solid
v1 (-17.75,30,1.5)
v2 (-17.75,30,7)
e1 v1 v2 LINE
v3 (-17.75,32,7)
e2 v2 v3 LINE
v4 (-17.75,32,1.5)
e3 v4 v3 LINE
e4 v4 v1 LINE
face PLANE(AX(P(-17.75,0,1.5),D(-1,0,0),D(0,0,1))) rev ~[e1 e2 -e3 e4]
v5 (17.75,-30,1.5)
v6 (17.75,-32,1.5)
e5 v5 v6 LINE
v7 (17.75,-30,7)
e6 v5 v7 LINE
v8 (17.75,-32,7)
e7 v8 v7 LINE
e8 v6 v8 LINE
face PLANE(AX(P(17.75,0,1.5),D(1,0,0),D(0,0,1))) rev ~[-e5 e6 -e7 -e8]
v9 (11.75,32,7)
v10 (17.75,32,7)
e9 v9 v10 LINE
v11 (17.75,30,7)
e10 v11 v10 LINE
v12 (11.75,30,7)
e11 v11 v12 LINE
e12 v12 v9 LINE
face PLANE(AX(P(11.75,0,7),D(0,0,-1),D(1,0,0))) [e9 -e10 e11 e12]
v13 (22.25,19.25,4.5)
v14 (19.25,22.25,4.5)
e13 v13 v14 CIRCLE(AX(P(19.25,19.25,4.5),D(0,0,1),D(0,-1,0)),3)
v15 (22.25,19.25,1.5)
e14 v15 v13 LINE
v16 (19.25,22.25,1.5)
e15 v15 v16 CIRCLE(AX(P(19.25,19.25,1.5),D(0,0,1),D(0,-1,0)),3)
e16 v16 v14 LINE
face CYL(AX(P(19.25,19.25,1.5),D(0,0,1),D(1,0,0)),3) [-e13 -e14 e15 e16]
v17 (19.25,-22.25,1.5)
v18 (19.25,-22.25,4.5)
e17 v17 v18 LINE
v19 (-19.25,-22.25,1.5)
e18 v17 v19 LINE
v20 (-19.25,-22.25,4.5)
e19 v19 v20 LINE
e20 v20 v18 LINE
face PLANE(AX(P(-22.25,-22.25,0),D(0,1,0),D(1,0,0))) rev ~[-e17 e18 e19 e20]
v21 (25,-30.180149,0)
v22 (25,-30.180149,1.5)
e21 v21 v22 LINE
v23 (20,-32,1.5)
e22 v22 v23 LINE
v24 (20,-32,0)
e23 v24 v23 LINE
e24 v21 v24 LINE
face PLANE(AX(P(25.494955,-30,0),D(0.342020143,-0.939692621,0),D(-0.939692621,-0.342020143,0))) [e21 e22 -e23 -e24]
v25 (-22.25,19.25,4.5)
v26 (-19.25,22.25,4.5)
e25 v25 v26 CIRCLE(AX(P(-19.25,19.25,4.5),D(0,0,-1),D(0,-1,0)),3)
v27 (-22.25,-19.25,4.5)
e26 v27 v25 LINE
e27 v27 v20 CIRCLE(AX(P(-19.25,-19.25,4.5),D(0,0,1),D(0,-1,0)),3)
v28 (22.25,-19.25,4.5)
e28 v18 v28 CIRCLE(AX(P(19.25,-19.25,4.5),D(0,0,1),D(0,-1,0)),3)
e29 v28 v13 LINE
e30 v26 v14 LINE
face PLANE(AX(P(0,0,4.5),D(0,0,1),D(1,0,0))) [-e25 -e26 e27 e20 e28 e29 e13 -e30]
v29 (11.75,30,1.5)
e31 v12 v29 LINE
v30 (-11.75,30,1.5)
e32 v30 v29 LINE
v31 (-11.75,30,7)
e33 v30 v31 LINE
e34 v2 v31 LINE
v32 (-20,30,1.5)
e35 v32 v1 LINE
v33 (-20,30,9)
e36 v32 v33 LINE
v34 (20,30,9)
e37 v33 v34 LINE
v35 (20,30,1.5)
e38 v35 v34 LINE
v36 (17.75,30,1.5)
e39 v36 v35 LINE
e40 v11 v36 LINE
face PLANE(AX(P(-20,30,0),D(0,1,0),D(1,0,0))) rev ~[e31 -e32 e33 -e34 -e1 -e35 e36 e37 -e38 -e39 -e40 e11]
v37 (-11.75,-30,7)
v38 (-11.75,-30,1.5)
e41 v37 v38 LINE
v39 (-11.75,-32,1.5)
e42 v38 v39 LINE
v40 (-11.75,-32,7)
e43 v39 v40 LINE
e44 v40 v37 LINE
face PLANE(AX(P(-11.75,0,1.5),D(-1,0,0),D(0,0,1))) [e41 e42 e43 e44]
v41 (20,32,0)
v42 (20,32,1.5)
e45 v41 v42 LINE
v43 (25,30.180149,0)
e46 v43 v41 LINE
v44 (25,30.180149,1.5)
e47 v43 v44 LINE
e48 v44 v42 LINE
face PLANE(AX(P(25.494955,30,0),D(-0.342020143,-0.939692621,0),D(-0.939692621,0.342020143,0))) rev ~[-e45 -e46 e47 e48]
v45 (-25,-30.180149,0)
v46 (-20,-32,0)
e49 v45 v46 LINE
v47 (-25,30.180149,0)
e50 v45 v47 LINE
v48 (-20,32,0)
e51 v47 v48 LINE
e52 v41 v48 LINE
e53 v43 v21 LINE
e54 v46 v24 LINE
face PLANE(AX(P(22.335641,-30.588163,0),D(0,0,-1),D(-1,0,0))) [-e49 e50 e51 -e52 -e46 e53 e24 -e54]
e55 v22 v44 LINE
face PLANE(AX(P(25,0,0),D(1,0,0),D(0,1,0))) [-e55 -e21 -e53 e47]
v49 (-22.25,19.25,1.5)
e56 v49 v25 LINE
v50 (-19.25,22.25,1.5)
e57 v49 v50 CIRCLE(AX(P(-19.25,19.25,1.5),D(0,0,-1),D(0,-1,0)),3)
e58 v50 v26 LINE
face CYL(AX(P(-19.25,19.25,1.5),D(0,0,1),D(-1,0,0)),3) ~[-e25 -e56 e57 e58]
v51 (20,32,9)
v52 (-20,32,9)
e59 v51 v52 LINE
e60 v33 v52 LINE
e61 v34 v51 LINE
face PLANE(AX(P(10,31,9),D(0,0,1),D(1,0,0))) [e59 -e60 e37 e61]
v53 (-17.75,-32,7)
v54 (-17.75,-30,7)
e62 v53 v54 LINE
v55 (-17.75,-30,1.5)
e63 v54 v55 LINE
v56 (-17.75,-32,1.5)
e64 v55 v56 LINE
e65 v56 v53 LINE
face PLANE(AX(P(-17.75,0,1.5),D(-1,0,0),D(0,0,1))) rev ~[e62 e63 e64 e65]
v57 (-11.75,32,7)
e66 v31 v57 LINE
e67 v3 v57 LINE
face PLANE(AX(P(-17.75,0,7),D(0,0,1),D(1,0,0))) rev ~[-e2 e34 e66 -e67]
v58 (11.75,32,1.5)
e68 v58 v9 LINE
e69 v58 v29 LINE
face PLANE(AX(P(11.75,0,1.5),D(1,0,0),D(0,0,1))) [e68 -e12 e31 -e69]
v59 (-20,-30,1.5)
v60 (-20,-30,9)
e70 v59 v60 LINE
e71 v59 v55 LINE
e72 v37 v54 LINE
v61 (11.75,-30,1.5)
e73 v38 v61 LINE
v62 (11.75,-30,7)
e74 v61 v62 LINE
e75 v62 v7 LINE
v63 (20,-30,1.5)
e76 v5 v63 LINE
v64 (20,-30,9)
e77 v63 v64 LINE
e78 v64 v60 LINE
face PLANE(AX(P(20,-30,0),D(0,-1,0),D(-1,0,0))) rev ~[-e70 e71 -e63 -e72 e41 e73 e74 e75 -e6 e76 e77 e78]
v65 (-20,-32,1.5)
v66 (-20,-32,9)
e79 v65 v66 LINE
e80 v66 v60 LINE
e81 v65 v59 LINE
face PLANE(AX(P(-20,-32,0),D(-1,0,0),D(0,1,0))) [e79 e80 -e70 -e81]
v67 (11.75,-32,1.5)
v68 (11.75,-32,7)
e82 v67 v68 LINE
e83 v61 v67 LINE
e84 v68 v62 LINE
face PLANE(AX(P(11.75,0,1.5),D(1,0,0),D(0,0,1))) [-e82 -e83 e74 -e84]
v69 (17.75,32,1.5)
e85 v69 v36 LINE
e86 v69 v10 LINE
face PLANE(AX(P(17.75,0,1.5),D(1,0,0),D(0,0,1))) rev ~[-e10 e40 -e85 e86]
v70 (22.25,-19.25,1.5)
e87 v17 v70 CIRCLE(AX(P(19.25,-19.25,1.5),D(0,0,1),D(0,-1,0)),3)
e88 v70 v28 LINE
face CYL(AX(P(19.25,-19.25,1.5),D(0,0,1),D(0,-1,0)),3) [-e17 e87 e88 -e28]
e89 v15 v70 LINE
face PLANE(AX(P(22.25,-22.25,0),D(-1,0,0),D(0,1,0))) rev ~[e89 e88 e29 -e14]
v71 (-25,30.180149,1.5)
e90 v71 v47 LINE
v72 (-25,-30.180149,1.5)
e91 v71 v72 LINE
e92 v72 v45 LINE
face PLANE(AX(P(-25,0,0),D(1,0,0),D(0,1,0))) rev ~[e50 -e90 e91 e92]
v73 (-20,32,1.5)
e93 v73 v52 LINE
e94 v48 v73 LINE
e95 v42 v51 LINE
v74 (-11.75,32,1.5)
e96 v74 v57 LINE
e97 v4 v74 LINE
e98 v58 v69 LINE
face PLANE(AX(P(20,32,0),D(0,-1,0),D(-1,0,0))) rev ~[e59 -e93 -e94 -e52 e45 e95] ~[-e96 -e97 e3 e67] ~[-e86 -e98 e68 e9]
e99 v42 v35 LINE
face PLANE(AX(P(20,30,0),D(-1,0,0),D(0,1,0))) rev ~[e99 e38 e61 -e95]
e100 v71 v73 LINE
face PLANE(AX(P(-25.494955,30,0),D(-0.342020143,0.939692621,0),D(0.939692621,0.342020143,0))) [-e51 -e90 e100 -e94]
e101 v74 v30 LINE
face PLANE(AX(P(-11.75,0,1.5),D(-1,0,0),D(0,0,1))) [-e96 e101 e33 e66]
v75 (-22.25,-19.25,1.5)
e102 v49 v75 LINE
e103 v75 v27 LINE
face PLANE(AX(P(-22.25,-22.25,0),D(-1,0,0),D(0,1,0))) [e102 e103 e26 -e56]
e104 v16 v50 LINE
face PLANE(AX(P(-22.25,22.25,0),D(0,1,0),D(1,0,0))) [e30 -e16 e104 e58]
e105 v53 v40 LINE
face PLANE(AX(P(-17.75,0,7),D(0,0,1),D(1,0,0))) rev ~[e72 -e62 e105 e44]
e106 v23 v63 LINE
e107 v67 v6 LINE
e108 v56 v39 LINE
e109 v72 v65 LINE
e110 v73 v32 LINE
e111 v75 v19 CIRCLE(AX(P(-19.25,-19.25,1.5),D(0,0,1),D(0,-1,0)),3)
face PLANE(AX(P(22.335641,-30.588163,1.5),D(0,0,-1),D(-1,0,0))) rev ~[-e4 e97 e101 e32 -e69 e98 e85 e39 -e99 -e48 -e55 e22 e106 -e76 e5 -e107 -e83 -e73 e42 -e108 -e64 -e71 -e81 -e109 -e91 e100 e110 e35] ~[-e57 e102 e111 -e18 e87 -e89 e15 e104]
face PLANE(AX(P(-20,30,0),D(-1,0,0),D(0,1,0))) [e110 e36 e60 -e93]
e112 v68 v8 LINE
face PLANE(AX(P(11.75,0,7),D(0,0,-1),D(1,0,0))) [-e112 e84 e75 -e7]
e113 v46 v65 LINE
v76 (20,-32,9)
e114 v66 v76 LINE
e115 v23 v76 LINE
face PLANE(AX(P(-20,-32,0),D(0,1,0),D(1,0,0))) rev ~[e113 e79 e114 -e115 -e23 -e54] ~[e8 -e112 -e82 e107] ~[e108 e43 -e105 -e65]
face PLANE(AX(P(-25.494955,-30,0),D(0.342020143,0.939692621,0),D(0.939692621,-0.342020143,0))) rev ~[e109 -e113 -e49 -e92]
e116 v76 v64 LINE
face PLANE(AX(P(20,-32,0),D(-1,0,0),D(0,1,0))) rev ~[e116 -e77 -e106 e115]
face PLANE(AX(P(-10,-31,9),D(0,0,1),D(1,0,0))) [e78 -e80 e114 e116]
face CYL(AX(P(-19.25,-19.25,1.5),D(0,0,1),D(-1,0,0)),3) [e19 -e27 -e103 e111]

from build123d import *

# Parameters (mm, degrees)
F0_W         = 50
F0_H         = 60
F1_DEPTH     = 1.5
F2_W         = 20
F2_H         = 2
F3_DEPTH     = 9
F4_W         = 6
F4_H         = 5.5
F5_DEPTH     = 32
F6_W         = 44.5
F6_H         = 44.5
F7_DEPTH     = 4.5
F8_R         = 3
F9_T4_DEPTH  = 1.5
F9_T9_DEPTH  = 1.5
F9_T14_DEPTH = 1.5
F9_T19_DEPTH = 1.5


# Not quite as in the source:
# - a fillet or chamfer that OpenCascade refuses, or shapes differently, is made with other operations: its cross-section is extruded or revolved along the edge and cut away or added
# - a feature of the source that left no trace in its solid (it failed there, or was rolled back) is left out


with BuildPart() as f1:
    # F0 (on Top) → F1 (new body)
    with BuildSketch(Plane.XY):
        Rectangle(F0_W, F0_H)
    extrude(amount=F1_DEPTH)

    # F2 (on Top) → F3 (join)
    with BuildSketch(Plane.XY):
        with Locations((10, 31)):
            Rectangle(F2_W, F2_H)
        with Locations((-10, 31)):
            Rectangle(F2_W, F2_H)
        with Locations((-10, -31)):
            Rectangle(F2_W, F2_H)
        with Locations((10, -31)):
            Rectangle(F2_W, F2_H)
    extrude(amount=F3_DEPTH)

    # F4 (on Front) → F5 (cut, symmetric)
    with BuildSketch(Plane.XZ):
        with Locations((-14.75, 4.25)):
            Rectangle(F4_W, F4_H)
        with Locations((14.75, 4.25)):
            Rectangle(F4_W, F4_H)
    extrude(amount=F5_DEPTH, both=True, mode=Mode.SUBTRACT)

    # F6 (on Top) → F7 (join)
    with BuildSketch(Plane.XY):
        Rectangle(F6_W, F6_H)
    extrude(amount=F7_DEPTH)

    # F8
    f8_edges = [f1.edges().sort_by_distance(p)[0] for p in [
        (22.25, -22.25, 3),
        (-22.25, -22.25, 3),
        (-22.25, 22.25, 3),
        (22.25, 22.25, 3),
    ]]
    fillet(f8_edges, radius=F8_R)

    # F9: chamfer of 2 x 5.4949548389 on 4 edges, made by hand


with BuildPart() as f9_tool2:
    # F9_s3 → F9_t4 (new body)
    with BuildSketch(Plane.XY):
        Polygon((25.4949548389, 30), (20, 32), (20, 30), align=None)
    extrude(amount=F9_T4_DEPTH)

    split(bisect_by=Plane.YZ.offset(25), keep=Keep.BOTTOM)


with BuildPart() as f1_1:
    add(f1.part)

    # F9_t1: union F9_tool2
    add(f9_tool2.part)


with BuildPart() as f9_tool7:
    # F9_s8 → F9_t9 (new body)
    with BuildSketch(Plane.XY):
        Polygon((-25.4949548389, -30), (-20, -32), (-20, -30), align=None)
    extrude(amount=F9_T9_DEPTH)

    split(bisect_by=Plane.YZ.offset(-25), keep=Keep.TOP)


with BuildPart() as f1_2:
    add(f1_1.part)

    # F9_t6: union F9_tool7
    add(f9_tool7.part)


with BuildPart() as f9_tool12:
    # F9_s13 → F9_t14 (new body)
    with BuildSketch(Plane.XY):
        Polygon((-25.4949548389, 30), (-20, 32), (-20, 30), align=None)
    extrude(amount=F9_T14_DEPTH)

    split(bisect_by=Plane.YZ.offset(-25), keep=Keep.TOP)


with BuildPart() as f1_3:
    add(f1_2.part)

    # F9_t11: union F9_tool12
    add(f9_tool12.part)


with BuildPart() as f9_tool17:
    # F9_s18 → F9_t19 (new body)
    with BuildSketch(Plane.XY):
        Polygon((25.4949548389, -30), (20, -32), (20, -30), align=None)
    extrude(amount=F9_T19_DEPTH)

    split(bisect_by=Plane.YZ.offset(25), keep=Keep.BOTTOM)


with BuildPart() as f1_4:
    add(f1_3.part)

    # F9_t16: union F9_tool17
    add(f9_tool17.part)


solid = f1_4.part
